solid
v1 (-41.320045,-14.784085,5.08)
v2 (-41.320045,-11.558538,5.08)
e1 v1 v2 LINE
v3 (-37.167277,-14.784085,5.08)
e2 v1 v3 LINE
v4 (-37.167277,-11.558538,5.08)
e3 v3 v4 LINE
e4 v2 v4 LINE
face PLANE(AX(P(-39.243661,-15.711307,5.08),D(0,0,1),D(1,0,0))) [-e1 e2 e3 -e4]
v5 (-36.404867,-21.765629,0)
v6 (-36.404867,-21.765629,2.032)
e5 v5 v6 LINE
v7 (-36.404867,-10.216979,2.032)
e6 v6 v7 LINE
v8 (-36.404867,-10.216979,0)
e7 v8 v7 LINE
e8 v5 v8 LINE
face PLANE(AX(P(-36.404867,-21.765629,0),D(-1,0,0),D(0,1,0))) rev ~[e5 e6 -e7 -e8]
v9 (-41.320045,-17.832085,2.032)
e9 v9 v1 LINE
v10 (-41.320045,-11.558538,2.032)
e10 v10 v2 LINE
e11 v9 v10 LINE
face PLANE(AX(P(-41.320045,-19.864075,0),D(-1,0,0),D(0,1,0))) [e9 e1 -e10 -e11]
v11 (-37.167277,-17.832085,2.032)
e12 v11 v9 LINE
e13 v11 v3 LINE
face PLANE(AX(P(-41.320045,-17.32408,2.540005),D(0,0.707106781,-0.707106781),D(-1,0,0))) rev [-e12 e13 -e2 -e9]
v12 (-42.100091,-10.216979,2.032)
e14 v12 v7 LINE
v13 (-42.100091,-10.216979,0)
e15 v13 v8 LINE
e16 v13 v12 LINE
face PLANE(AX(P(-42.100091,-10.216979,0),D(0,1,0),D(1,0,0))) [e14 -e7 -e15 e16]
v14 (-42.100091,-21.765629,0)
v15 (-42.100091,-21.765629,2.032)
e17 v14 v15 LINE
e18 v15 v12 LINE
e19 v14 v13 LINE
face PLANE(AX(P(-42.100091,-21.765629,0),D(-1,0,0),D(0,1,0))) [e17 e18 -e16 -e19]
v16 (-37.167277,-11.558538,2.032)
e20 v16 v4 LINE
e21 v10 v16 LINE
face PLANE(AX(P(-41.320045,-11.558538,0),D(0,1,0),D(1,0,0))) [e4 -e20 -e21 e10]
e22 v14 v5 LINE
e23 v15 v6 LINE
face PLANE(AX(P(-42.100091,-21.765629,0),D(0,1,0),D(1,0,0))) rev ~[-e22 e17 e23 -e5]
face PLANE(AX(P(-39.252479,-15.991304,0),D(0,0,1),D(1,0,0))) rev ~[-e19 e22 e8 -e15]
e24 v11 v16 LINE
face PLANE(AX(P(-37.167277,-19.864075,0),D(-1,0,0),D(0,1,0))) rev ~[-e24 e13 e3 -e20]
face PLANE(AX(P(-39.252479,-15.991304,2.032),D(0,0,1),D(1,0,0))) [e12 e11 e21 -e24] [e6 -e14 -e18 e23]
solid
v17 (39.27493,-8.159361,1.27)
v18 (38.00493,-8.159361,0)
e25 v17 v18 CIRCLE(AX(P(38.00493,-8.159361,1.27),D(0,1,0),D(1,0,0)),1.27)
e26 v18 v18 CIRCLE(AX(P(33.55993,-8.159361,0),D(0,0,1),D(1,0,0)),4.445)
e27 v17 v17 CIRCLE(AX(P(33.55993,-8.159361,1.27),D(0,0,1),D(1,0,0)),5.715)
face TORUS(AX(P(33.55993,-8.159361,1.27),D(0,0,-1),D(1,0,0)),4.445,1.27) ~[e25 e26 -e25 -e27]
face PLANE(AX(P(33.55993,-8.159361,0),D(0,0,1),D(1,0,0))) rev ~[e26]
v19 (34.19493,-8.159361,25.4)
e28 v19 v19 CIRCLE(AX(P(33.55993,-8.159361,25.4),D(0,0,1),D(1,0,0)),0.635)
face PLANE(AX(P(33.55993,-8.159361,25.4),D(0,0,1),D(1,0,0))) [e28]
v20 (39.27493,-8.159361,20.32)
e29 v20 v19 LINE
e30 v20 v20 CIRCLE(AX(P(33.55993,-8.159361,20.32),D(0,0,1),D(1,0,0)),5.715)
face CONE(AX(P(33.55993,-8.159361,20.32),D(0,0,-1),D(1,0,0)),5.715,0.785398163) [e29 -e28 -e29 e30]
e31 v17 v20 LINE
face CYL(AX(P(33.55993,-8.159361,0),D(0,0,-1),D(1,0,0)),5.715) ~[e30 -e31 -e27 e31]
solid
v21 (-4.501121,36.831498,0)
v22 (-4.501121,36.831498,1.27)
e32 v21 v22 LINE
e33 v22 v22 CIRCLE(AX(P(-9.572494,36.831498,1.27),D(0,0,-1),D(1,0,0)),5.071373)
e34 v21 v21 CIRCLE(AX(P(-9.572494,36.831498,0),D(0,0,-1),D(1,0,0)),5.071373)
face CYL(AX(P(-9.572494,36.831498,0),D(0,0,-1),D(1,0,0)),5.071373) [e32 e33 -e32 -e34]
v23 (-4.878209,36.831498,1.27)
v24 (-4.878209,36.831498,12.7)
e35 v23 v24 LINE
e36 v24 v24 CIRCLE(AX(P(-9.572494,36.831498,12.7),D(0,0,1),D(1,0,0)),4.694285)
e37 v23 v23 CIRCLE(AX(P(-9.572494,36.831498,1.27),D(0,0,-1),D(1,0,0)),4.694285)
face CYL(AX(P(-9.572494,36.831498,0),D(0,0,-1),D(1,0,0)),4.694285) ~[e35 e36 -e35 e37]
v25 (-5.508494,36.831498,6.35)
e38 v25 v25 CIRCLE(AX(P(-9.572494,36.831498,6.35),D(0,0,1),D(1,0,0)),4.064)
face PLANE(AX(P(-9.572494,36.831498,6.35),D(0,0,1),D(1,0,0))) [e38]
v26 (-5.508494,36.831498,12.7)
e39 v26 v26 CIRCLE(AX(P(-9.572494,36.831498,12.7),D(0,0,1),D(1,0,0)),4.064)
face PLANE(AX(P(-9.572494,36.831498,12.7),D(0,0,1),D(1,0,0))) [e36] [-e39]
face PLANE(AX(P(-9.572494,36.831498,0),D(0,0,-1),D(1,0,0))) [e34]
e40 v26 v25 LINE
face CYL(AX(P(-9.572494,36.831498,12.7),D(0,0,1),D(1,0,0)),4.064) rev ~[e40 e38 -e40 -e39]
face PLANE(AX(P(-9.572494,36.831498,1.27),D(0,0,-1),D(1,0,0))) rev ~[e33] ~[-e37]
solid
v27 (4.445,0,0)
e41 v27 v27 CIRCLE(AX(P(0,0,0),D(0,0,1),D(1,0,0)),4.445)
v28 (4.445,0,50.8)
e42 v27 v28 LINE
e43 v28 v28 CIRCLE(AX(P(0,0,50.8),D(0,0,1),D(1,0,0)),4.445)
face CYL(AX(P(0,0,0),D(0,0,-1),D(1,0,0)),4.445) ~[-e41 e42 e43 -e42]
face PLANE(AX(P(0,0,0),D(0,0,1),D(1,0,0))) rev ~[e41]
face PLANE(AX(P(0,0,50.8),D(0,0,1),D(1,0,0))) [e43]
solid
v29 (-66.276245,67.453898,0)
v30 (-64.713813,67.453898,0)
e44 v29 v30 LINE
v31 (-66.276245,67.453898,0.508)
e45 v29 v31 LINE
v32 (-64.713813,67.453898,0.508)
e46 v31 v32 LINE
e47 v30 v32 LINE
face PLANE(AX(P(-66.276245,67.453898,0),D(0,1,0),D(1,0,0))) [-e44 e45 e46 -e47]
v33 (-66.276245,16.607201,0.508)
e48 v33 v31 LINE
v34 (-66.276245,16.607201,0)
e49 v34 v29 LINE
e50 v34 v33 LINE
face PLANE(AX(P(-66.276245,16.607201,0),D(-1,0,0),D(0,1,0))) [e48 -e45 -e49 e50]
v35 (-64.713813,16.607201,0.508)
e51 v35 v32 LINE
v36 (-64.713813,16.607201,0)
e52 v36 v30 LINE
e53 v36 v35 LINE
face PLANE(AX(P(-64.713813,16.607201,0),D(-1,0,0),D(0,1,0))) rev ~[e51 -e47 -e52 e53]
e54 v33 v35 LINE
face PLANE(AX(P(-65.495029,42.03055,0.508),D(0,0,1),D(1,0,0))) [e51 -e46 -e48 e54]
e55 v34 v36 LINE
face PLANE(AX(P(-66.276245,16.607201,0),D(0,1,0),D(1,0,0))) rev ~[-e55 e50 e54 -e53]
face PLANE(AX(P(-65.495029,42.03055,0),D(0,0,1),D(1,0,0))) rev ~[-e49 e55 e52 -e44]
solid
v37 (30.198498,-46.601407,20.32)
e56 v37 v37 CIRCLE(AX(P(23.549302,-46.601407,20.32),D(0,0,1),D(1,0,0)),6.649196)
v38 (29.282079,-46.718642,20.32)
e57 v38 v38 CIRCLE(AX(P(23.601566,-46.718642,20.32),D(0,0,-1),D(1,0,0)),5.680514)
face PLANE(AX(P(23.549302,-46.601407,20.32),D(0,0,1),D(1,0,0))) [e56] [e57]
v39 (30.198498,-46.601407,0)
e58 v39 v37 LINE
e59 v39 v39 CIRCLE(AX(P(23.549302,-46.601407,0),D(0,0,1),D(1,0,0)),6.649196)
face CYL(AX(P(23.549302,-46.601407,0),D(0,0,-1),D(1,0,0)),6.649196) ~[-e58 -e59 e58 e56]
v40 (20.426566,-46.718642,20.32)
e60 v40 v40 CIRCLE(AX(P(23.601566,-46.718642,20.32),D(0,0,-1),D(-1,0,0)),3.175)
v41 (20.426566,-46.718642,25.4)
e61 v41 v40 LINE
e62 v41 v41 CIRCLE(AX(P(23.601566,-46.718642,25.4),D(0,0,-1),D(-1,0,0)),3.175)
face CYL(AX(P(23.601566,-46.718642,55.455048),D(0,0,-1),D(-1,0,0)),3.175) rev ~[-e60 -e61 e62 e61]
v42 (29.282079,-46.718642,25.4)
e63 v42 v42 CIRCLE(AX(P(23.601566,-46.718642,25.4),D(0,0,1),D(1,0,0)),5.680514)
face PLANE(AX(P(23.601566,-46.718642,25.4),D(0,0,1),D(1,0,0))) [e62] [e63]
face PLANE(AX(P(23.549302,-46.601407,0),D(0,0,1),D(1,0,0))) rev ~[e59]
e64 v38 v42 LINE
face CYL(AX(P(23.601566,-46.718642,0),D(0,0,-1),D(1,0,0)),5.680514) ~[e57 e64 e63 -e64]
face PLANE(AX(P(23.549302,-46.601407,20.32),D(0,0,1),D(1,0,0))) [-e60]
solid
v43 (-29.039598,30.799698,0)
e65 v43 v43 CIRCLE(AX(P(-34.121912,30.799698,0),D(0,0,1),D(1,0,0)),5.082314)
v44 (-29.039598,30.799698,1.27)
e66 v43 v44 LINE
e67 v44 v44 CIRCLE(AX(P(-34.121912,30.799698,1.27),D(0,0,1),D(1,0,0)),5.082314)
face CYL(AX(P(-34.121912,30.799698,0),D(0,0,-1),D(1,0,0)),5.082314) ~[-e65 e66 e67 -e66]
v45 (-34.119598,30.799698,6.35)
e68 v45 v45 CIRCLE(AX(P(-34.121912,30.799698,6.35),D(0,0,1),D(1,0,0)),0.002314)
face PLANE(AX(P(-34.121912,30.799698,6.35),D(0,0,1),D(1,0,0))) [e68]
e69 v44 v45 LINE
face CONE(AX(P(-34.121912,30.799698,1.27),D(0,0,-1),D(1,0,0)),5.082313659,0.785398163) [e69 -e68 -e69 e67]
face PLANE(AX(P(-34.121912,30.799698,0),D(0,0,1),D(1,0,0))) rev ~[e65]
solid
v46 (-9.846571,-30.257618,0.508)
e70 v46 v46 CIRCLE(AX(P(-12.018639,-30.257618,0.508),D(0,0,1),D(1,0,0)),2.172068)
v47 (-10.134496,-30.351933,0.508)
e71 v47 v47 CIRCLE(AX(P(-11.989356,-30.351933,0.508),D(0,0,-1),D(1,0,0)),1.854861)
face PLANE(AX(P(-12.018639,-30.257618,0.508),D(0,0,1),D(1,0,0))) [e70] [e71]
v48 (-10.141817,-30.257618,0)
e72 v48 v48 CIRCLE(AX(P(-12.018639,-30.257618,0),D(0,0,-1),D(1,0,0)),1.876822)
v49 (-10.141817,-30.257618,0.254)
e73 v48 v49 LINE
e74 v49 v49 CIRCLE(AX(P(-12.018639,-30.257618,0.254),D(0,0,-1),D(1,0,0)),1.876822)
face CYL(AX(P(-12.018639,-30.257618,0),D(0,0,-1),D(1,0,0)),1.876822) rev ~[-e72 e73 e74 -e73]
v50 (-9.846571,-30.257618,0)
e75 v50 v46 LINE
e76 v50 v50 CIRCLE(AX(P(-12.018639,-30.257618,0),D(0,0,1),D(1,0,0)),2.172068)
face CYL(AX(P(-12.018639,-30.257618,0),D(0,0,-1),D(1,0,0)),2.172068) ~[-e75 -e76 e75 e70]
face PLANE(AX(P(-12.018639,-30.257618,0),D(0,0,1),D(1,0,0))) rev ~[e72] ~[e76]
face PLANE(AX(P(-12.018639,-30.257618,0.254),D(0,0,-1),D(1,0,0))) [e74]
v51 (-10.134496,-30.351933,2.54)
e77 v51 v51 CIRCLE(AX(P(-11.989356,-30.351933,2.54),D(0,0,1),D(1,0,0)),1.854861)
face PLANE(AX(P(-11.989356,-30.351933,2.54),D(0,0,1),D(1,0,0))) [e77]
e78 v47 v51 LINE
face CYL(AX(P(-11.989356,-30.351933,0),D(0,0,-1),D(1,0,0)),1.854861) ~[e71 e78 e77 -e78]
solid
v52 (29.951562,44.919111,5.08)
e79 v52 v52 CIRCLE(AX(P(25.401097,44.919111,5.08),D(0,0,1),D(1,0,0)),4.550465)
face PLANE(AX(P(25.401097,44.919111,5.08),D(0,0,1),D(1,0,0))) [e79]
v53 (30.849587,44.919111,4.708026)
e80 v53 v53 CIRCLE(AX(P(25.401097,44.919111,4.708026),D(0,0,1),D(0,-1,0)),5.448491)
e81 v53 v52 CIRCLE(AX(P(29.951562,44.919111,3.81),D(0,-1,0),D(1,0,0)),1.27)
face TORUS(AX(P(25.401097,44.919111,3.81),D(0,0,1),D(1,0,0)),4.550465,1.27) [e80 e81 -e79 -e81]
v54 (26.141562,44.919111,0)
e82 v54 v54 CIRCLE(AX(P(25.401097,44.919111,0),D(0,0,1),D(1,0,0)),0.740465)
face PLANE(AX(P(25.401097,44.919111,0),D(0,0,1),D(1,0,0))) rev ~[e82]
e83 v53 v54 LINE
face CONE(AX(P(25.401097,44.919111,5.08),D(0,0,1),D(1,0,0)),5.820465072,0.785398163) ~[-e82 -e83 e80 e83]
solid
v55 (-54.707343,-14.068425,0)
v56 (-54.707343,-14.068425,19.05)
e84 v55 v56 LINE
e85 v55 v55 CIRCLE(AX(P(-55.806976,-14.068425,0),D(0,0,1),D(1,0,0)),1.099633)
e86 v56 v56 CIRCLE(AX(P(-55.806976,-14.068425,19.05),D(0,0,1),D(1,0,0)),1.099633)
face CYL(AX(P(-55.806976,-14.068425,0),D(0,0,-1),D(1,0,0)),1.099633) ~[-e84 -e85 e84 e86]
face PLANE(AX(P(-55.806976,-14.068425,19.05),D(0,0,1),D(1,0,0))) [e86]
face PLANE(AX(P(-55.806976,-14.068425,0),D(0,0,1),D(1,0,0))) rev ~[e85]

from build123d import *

# Parameters (mm, degrees)
F0_R      = 4.445
F1_DEPTH  = 50.8
F2_R      = 5.8204650715
F3_DEPTH  = 5.08
F4_R      = 1.27
F5_R      = 5.715
F6_DEPTH  = 25.4
F7_R      = 1.27
F8_SIZE   = 5.08
F10_R     = 4.6942850123
F11_DEPTH = 12.7
F12_R     = 4.064
F13_DEPTH = 6.35
F14_R     = 5.0713728951
F15_DEPTH = 1.27
F16_R     = 5.0823136585
F17_DEPTH = 6.35
F18_SIZE  = 5.08
F19_R     = 1.0996327095
F20_DEPTH = 19.05
F21_W     = 4.1527673602
F21_H     = 8.3055365831
F22_DEPTH = 5.08
F23_SIZE  = 5.07999
F24_W     = 5.6952238083
F24_H     = 11.5486495197
F25_DEPTH = 2.032
F26_W     = 1.5624314547
F26_H     = 50.8466977626
F27_DEPTH = 0.508
F28_R     = 5.6805138748
F29_DEPTH = 25.4
F31_D     = 6.35
F32_R     = 6.6491964472
F33_DEPTH = 20.32
F34_R     = 1.854860509
F35_DEPTH = 2.54
F36_R     = 2.1720678398
F37_DEPTH = 0.508
F38_R     = 1.8768217279
F39_DEPTH = 0.254


# Not quite as in the source:
# - a fillet or chamfer that OpenCascade refuses, or shapes differently, is made with other operations: its cross-section is extruded or revolved along the edge and cut away or added
# - a fillet or chamfer is up to 0.001 mm smaller than in the source, because OpenCascade refuses the exact size


with BuildPart() as f1:
    # F0 (on Top) → F1 (new body)
    with BuildSketch(Plane.XY):
        Circle(F0_R)
    extrude(amount=F1_DEPTH)


with BuildPart() as f3:
    # F2 (on Top) → F3 (new body)
    with BuildSketch(Plane.XY):
        with Locations((25.401096791, 44.9191108346)):
            Circle(F2_R)
    extrude(amount=F3_DEPTH)

    # F4
    f4_edges = [f3.edges().sort_by_distance(p)[0] for p in [
        (19.580632, 44.919111, 5.08),
    ]]
    fillet(f4_edges, radius=F4_R)

    # F9: chamfer of 5.08 on 3 edges, made by hand

    # F9_s1 → F9_t2 (revolve, cut)
    with BuildSketch(Plane.XZ.offset(-44.9191108346)):
        Polygon((31.2215618626, 5.08), (26.1415618626, 0), (31.2215618626, 0), align=None)
    revolve(axis=Axis((25.401096791, 44.9191108346, 0), (0, 0, 1)), mode=Mode.SUBTRACT)


with BuildPart() as f6:
    # F5 (on Top) → F6 (new body)
    with BuildSketch(Plane.XY):
        with Locations((33.5599295795, -8.1593608484)):
            Circle(F5_R)
    extrude(amount=F6_DEPTH)

    # F7
    f7_edges = [f6.edges().sort_by_distance(p)[0] for p in [
        (27.84493, -8.159361, 0),
    ]]
    fillet(f7_edges, radius=F7_R)

    # F8
    f8_edges = [f6.edges().sort_by_distance(p)[0] for p in [
        (29.11493, -8.159361, 0),
        (39.27493, -8.159361, 13.335),
        (27.84493, -8.159361, 1.27),
        (27.84493, -8.159361, 25.4),
    ]]
    chamfer(f8_edges, length=F8_SIZE)


with BuildPart() as f11:
    # F10 (on Top) → F11 (new body)
    with BuildSketch(Plane.XY):
        with Locations((-9.5724938437, 36.8314981461)):
            Circle(F10_R)
    extrude(amount=F11_DEPTH)

    # F12 (on face) → F13 (cut)
    with BuildSketch(Plane.XY.offset(12.7)):
        with Locations((-9.5724938437, 36.8314981461)):
            Circle(F12_R)
    extrude(amount=-F13_DEPTH, mode=Mode.SUBTRACT)

    # F14 (on face) → F15 (join)
    with BuildSketch(Plane(origin=(0, 0, 0), x_dir=(1, 0, 0), z_dir=(0, 0, -1))):
        with Locations((-9.5724938437, -36.8314981461)):
            Circle(F14_R)
    extrude(amount=-F15_DEPTH)


with BuildPart() as f17:
    # F16 (on Top) → F17 (new body)
    with BuildSketch(Plane.XY):
        with Locations((-34.1219119728, 30.7996980846)):
            Circle(F16_R)
    extrude(amount=F17_DEPTH)

    # F18
    f18_edges = [f17.edges().sort_by_distance(p)[0] for p in [
        (-39.204226, 30.799698, 6.35),
    ]]
    chamfer(f18_edges, length=F18_SIZE)


with BuildPart() as f20:
    # F19 (on Top) → F20 (new body)
    with BuildSketch(Plane.XY):
        with Locations((-55.8069758117, -14.0684247017)):
            Circle(F19_R)
    extrude(amount=F20_DEPTH)


with BuildPart() as f22:
    # F21 (on Top) → F22 (new body)
    with BuildSketch(Plane.XY):
        with Locations((-39.2436608672, -15.7113065943)):
            Rectangle(F21_W, F21_H)
    extrude(amount=F22_DEPTH)

    # F23 (size 5.08 in the source; OpenCascade refuses exactly that, so slightly less here)
    f23_edges = [f22.edges().sort_by_distance(p)[0] for p in [
        (-39.243661, -19.864075, 5.08),
    ]]
    chamfer(f23_edges, length=F23_SIZE)

    # F24 (on Top) → F25 (join)
    with BuildSketch(Plane.XY):
        with Locations((-39.2524786294, -15.9913040698)):
            Rectangle(F24_W, F24_H)
    extrude(amount=F25_DEPTH)


with BuildPart() as f27:
    # F26 (on Top) → F27 (new body)
    with BuildSketch(Plane.XY):
        with Locations((-65.4950290918, 42.0305496082)):
            Rectangle(F26_W, F26_H)
    extrude(amount=F27_DEPTH)


with BuildPart() as f29:
    # F28 (on Top) → F29 (new body)
    with BuildSketch(Plane.XY):
        with Locations((23.60156551, -46.7186421156)):
            Circle(F28_R)
    extrude(amount=F29_DEPTH)

    # F31 (through all)
    with Locations(Plane.XY.offset(25.4)):
        with Locations((23.60156551, -46.7186421156)):
            Hole(F31_D / 2)

    # F32 (on Top) → F33 (join)
    with BuildSketch(Plane.XY):
        with Locations((23.5493015498, -46.6014072299)):
            Circle(F32_R)
    extrude(amount=F33_DEPTH)


with BuildPart() as f35:
    # F34 (on Top) → F35 (new body)
    with BuildSketch(Plane.XY):
        with Locations((-11.9893560186, -30.3519330919)):
            Circle(F34_R)
    extrude(amount=F35_DEPTH)

    # F36 (on Top) → F37 (join)
    with BuildSketch(Plane.XY):
        with Locations((-12.018638663, -30.2576180547)):
            Circle(F36_R)
    extrude(amount=F37_DEPTH)

    # F38 (on face) → F39 (cut)
    with BuildSketch(Plane(origin=(0, 0, 0), x_dir=(1, 0, 0), z_dir=(0, 0, -1))):
        with Locations((-12.018638663, 30.2576180547)):
            Circle(F38_R)
    extrude(amount=-F39_DEPTH, mode=Mode.SUBTRACT)


solid = Compound([f1.part, f3.part, f6.part, f11.part, f17.part, f20.part, f22.part, f27.part, f29.part, f35.part])
